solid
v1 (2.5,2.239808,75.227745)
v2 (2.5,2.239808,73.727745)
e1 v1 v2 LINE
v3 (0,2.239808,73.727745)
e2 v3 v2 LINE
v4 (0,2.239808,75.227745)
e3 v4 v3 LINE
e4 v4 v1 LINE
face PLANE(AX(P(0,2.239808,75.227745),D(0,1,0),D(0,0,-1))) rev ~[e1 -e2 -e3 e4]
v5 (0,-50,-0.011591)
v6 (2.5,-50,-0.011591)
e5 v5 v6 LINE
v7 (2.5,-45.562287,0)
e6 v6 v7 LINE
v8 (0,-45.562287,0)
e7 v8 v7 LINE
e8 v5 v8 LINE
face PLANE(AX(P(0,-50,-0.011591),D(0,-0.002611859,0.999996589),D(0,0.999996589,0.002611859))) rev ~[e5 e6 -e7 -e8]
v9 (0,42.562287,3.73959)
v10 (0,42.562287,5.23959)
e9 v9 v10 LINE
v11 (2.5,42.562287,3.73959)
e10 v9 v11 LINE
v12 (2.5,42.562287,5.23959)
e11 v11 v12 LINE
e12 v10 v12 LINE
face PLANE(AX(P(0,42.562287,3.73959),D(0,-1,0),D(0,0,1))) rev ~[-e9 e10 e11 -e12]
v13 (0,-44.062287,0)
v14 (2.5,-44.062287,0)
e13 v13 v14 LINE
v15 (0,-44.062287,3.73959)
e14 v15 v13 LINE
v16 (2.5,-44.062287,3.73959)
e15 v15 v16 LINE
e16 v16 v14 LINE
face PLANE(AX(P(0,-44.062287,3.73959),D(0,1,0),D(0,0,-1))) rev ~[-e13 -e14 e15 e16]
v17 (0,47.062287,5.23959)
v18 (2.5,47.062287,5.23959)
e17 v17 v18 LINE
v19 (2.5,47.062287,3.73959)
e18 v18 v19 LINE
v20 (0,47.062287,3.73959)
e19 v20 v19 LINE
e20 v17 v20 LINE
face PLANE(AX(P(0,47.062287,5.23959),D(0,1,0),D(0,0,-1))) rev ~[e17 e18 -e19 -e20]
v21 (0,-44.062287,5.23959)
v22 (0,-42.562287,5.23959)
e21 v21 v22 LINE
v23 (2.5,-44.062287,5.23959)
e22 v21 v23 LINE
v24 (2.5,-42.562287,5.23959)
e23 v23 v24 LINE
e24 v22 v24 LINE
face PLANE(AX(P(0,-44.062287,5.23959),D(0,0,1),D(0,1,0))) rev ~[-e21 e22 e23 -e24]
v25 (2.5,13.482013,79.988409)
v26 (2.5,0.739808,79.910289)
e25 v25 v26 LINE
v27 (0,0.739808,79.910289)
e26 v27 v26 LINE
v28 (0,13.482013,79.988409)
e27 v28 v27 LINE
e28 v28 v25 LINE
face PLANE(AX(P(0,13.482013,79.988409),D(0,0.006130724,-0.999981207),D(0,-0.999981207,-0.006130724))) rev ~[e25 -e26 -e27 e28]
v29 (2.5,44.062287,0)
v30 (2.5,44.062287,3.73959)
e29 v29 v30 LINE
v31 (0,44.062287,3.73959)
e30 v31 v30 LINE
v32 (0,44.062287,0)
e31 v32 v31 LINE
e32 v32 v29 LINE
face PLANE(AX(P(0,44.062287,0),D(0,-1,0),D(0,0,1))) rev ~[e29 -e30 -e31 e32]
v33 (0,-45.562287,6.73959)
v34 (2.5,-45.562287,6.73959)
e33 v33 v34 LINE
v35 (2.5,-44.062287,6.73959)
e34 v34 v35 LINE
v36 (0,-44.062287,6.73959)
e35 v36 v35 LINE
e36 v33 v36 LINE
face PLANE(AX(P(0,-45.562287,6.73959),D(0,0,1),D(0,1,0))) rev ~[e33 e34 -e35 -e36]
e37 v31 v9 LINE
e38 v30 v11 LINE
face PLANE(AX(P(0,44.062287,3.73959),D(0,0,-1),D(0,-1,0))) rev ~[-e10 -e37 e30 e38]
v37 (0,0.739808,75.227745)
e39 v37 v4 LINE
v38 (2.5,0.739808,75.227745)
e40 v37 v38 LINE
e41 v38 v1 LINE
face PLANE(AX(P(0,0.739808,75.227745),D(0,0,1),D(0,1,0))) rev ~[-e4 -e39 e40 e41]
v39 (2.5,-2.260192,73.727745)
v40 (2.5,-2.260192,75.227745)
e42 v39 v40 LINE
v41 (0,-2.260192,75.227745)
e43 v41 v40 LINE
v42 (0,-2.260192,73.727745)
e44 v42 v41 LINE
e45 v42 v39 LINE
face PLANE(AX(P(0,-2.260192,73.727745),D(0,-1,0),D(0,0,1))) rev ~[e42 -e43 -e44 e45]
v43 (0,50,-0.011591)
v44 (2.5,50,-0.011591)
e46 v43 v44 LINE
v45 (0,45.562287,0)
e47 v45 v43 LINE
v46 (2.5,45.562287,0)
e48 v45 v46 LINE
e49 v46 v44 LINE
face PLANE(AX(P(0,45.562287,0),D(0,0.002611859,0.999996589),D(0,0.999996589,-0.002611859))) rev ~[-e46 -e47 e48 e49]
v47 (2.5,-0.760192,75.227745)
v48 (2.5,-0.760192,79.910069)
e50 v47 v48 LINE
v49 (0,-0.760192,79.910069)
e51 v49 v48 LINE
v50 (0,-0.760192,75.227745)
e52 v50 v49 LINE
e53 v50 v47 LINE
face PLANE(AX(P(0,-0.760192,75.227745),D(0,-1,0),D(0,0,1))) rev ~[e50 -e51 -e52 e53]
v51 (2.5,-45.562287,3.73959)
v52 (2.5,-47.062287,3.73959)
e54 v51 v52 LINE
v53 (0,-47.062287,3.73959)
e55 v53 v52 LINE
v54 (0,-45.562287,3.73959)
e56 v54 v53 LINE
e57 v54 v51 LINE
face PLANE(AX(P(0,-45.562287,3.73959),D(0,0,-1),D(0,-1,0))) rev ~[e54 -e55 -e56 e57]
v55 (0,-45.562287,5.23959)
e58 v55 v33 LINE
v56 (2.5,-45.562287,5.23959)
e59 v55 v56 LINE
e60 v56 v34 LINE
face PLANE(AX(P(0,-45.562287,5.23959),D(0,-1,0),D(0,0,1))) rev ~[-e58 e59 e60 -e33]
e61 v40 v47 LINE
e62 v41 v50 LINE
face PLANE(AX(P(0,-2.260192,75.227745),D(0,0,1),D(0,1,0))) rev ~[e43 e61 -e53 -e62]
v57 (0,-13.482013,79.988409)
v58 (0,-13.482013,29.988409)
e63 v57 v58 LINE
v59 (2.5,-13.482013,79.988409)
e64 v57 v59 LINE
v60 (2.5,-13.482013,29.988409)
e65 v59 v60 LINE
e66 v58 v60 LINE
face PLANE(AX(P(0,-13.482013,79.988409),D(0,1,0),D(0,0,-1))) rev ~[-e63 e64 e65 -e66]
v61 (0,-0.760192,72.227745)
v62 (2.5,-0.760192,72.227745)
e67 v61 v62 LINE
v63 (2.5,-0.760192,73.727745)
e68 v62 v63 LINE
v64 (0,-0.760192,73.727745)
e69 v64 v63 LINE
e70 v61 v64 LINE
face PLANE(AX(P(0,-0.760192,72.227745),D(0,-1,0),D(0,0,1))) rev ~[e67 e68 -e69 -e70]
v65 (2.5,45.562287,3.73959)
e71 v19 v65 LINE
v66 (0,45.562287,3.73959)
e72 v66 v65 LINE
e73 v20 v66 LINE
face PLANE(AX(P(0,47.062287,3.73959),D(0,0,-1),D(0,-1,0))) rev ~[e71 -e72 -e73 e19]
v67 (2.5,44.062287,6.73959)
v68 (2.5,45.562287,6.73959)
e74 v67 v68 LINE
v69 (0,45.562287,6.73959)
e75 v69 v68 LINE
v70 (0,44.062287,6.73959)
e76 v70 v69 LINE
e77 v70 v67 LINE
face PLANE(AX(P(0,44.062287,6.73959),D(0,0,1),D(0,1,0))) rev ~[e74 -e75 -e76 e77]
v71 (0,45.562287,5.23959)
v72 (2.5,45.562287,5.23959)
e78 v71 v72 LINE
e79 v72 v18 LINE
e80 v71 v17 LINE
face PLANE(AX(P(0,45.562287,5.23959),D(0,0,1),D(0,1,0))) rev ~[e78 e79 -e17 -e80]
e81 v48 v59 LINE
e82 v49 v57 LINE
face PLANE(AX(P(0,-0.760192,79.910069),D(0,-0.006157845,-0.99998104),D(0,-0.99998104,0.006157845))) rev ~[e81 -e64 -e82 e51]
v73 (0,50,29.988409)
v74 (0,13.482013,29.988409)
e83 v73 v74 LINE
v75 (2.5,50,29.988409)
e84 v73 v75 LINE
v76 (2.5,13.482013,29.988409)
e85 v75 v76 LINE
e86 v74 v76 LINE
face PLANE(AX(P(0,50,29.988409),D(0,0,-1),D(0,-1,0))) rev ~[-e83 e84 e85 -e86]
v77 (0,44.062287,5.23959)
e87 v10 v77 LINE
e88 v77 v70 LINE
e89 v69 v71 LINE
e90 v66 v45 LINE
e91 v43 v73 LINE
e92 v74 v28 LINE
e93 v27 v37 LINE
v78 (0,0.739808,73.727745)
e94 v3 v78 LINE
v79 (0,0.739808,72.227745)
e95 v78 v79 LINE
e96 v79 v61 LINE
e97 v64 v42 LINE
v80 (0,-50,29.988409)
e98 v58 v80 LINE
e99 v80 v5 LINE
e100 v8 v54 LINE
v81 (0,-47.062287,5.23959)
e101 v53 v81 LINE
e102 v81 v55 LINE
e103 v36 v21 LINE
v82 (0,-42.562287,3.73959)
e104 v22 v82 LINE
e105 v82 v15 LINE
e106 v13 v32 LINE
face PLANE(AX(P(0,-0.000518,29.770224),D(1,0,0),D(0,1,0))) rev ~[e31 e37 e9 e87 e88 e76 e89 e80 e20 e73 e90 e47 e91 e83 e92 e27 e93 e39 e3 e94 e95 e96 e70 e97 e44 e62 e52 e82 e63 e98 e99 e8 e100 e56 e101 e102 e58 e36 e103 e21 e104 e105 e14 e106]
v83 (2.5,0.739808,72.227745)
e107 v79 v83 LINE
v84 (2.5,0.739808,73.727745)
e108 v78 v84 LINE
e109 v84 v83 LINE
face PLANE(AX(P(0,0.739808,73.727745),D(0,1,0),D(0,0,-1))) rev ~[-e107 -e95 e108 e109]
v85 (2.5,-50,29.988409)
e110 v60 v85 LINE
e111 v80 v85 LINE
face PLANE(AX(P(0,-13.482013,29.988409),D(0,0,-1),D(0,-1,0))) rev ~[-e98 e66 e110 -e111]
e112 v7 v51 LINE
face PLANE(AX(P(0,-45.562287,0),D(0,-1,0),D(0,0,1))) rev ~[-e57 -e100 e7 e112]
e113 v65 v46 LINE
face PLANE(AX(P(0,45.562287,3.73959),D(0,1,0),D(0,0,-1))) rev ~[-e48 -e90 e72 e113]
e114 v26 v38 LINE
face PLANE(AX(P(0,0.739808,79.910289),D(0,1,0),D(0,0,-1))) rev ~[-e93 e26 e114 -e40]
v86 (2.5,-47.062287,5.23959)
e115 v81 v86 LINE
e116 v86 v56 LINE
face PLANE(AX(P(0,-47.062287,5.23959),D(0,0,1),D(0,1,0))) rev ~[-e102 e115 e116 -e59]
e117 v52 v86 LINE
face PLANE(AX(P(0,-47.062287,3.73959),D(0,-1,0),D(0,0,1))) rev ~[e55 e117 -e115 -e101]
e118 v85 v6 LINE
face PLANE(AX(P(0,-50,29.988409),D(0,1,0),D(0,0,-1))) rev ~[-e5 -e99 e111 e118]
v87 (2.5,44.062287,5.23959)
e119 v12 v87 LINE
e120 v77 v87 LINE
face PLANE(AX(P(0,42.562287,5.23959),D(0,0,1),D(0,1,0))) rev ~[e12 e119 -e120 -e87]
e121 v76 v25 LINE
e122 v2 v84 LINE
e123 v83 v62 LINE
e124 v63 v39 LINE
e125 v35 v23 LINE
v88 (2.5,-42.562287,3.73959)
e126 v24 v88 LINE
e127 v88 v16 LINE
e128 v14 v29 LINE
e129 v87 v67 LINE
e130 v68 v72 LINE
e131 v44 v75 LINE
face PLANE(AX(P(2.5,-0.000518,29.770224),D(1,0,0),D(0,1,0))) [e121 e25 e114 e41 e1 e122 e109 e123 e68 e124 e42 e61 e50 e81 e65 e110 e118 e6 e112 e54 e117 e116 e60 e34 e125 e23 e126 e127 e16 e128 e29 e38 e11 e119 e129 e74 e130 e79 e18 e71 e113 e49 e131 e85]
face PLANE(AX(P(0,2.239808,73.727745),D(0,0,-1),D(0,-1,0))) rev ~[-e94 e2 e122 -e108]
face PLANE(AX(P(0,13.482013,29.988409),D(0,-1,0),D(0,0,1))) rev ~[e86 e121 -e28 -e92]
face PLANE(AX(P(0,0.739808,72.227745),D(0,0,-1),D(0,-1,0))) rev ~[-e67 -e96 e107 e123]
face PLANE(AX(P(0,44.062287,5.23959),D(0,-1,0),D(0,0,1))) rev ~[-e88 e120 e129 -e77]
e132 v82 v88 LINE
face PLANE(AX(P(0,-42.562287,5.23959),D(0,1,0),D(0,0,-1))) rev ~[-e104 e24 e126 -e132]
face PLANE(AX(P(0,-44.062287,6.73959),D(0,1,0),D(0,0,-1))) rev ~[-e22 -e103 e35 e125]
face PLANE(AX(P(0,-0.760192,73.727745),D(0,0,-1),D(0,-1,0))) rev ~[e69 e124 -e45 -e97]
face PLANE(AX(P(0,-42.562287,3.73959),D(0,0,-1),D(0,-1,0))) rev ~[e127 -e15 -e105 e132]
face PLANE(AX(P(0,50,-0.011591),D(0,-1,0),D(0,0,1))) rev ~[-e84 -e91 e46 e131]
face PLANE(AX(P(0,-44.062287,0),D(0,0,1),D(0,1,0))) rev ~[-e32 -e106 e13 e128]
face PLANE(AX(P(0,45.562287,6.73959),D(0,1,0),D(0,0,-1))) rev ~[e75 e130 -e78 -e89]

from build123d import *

# Parameters (mm, degrees)
F1_DEPTH = 2.5


# Not quite as in the source:
# - a feature names something its author has since deleted; it is built from what else it names


with BuildPart() as f1:
    # F0 (on Right) → F1 (new body)
    with BuildSketch(Plane.YZ):
        Polygon((45.5622866154, 0), (50, -0.0115907192), (50, 29.9884092808), (13.482012786, 29.9884092808), (13.482012786, 79.9884092808), (0.7398080197, 79.910288877), (0.7398080197, 75.2277448773), (2.2398080197, 75.2277448773), (2.2398080197, 73.7277448773), (0.7398080197, 73.7277448773), (0.7398080197, 72.2277448773), (-0.7601919803, 72.2277448773), (-0.7601919803, 73.7277448773), (-2.2601919803, 73.7277448773), (-2.2601919803, 75.2277448773), (-0.7601919803, 75.2277448773), (-0.7601919803, 79.9100687942), (-13.482012786, 79.9884092808), (-13.482012786, 29.9884092808), (-50, 29.9884092808), (-50, -0.0115907192), (-45.5622866154, 0), (-45.5622866154, 3.739590158), (-47.0622866154, 3.739590158), (-47.0622866154, 5.239590158), (-45.5622866154, 5.239590158), (-45.5622866154, 6.739590158), (-44.0622866154, 6.739590158), (-44.0622866154, 5.239590158), (-42.5622866154, 5.239590158), (-42.5622866154, 3.739590158), (-44.0622866154, 3.739590158), (-44.0622866154, 0), (0, 0), (44.0622866154, 0), (44.0622866154, 3.739590158), (42.5622866154, 3.739590158), (42.5622866154, 5.239590158), (44.0622866154, 5.239590158), (44.0622866154, 6.739590158), (45.5622866154, 6.739590158), (45.5622866154, 5.239590158), (47.0622866154, 5.239590158), (47.0622866154, 3.739590158), (45.5622866154, 3.739590158), align=None)
    extrude(amount=F1_DEPTH)


solid = f1.part
